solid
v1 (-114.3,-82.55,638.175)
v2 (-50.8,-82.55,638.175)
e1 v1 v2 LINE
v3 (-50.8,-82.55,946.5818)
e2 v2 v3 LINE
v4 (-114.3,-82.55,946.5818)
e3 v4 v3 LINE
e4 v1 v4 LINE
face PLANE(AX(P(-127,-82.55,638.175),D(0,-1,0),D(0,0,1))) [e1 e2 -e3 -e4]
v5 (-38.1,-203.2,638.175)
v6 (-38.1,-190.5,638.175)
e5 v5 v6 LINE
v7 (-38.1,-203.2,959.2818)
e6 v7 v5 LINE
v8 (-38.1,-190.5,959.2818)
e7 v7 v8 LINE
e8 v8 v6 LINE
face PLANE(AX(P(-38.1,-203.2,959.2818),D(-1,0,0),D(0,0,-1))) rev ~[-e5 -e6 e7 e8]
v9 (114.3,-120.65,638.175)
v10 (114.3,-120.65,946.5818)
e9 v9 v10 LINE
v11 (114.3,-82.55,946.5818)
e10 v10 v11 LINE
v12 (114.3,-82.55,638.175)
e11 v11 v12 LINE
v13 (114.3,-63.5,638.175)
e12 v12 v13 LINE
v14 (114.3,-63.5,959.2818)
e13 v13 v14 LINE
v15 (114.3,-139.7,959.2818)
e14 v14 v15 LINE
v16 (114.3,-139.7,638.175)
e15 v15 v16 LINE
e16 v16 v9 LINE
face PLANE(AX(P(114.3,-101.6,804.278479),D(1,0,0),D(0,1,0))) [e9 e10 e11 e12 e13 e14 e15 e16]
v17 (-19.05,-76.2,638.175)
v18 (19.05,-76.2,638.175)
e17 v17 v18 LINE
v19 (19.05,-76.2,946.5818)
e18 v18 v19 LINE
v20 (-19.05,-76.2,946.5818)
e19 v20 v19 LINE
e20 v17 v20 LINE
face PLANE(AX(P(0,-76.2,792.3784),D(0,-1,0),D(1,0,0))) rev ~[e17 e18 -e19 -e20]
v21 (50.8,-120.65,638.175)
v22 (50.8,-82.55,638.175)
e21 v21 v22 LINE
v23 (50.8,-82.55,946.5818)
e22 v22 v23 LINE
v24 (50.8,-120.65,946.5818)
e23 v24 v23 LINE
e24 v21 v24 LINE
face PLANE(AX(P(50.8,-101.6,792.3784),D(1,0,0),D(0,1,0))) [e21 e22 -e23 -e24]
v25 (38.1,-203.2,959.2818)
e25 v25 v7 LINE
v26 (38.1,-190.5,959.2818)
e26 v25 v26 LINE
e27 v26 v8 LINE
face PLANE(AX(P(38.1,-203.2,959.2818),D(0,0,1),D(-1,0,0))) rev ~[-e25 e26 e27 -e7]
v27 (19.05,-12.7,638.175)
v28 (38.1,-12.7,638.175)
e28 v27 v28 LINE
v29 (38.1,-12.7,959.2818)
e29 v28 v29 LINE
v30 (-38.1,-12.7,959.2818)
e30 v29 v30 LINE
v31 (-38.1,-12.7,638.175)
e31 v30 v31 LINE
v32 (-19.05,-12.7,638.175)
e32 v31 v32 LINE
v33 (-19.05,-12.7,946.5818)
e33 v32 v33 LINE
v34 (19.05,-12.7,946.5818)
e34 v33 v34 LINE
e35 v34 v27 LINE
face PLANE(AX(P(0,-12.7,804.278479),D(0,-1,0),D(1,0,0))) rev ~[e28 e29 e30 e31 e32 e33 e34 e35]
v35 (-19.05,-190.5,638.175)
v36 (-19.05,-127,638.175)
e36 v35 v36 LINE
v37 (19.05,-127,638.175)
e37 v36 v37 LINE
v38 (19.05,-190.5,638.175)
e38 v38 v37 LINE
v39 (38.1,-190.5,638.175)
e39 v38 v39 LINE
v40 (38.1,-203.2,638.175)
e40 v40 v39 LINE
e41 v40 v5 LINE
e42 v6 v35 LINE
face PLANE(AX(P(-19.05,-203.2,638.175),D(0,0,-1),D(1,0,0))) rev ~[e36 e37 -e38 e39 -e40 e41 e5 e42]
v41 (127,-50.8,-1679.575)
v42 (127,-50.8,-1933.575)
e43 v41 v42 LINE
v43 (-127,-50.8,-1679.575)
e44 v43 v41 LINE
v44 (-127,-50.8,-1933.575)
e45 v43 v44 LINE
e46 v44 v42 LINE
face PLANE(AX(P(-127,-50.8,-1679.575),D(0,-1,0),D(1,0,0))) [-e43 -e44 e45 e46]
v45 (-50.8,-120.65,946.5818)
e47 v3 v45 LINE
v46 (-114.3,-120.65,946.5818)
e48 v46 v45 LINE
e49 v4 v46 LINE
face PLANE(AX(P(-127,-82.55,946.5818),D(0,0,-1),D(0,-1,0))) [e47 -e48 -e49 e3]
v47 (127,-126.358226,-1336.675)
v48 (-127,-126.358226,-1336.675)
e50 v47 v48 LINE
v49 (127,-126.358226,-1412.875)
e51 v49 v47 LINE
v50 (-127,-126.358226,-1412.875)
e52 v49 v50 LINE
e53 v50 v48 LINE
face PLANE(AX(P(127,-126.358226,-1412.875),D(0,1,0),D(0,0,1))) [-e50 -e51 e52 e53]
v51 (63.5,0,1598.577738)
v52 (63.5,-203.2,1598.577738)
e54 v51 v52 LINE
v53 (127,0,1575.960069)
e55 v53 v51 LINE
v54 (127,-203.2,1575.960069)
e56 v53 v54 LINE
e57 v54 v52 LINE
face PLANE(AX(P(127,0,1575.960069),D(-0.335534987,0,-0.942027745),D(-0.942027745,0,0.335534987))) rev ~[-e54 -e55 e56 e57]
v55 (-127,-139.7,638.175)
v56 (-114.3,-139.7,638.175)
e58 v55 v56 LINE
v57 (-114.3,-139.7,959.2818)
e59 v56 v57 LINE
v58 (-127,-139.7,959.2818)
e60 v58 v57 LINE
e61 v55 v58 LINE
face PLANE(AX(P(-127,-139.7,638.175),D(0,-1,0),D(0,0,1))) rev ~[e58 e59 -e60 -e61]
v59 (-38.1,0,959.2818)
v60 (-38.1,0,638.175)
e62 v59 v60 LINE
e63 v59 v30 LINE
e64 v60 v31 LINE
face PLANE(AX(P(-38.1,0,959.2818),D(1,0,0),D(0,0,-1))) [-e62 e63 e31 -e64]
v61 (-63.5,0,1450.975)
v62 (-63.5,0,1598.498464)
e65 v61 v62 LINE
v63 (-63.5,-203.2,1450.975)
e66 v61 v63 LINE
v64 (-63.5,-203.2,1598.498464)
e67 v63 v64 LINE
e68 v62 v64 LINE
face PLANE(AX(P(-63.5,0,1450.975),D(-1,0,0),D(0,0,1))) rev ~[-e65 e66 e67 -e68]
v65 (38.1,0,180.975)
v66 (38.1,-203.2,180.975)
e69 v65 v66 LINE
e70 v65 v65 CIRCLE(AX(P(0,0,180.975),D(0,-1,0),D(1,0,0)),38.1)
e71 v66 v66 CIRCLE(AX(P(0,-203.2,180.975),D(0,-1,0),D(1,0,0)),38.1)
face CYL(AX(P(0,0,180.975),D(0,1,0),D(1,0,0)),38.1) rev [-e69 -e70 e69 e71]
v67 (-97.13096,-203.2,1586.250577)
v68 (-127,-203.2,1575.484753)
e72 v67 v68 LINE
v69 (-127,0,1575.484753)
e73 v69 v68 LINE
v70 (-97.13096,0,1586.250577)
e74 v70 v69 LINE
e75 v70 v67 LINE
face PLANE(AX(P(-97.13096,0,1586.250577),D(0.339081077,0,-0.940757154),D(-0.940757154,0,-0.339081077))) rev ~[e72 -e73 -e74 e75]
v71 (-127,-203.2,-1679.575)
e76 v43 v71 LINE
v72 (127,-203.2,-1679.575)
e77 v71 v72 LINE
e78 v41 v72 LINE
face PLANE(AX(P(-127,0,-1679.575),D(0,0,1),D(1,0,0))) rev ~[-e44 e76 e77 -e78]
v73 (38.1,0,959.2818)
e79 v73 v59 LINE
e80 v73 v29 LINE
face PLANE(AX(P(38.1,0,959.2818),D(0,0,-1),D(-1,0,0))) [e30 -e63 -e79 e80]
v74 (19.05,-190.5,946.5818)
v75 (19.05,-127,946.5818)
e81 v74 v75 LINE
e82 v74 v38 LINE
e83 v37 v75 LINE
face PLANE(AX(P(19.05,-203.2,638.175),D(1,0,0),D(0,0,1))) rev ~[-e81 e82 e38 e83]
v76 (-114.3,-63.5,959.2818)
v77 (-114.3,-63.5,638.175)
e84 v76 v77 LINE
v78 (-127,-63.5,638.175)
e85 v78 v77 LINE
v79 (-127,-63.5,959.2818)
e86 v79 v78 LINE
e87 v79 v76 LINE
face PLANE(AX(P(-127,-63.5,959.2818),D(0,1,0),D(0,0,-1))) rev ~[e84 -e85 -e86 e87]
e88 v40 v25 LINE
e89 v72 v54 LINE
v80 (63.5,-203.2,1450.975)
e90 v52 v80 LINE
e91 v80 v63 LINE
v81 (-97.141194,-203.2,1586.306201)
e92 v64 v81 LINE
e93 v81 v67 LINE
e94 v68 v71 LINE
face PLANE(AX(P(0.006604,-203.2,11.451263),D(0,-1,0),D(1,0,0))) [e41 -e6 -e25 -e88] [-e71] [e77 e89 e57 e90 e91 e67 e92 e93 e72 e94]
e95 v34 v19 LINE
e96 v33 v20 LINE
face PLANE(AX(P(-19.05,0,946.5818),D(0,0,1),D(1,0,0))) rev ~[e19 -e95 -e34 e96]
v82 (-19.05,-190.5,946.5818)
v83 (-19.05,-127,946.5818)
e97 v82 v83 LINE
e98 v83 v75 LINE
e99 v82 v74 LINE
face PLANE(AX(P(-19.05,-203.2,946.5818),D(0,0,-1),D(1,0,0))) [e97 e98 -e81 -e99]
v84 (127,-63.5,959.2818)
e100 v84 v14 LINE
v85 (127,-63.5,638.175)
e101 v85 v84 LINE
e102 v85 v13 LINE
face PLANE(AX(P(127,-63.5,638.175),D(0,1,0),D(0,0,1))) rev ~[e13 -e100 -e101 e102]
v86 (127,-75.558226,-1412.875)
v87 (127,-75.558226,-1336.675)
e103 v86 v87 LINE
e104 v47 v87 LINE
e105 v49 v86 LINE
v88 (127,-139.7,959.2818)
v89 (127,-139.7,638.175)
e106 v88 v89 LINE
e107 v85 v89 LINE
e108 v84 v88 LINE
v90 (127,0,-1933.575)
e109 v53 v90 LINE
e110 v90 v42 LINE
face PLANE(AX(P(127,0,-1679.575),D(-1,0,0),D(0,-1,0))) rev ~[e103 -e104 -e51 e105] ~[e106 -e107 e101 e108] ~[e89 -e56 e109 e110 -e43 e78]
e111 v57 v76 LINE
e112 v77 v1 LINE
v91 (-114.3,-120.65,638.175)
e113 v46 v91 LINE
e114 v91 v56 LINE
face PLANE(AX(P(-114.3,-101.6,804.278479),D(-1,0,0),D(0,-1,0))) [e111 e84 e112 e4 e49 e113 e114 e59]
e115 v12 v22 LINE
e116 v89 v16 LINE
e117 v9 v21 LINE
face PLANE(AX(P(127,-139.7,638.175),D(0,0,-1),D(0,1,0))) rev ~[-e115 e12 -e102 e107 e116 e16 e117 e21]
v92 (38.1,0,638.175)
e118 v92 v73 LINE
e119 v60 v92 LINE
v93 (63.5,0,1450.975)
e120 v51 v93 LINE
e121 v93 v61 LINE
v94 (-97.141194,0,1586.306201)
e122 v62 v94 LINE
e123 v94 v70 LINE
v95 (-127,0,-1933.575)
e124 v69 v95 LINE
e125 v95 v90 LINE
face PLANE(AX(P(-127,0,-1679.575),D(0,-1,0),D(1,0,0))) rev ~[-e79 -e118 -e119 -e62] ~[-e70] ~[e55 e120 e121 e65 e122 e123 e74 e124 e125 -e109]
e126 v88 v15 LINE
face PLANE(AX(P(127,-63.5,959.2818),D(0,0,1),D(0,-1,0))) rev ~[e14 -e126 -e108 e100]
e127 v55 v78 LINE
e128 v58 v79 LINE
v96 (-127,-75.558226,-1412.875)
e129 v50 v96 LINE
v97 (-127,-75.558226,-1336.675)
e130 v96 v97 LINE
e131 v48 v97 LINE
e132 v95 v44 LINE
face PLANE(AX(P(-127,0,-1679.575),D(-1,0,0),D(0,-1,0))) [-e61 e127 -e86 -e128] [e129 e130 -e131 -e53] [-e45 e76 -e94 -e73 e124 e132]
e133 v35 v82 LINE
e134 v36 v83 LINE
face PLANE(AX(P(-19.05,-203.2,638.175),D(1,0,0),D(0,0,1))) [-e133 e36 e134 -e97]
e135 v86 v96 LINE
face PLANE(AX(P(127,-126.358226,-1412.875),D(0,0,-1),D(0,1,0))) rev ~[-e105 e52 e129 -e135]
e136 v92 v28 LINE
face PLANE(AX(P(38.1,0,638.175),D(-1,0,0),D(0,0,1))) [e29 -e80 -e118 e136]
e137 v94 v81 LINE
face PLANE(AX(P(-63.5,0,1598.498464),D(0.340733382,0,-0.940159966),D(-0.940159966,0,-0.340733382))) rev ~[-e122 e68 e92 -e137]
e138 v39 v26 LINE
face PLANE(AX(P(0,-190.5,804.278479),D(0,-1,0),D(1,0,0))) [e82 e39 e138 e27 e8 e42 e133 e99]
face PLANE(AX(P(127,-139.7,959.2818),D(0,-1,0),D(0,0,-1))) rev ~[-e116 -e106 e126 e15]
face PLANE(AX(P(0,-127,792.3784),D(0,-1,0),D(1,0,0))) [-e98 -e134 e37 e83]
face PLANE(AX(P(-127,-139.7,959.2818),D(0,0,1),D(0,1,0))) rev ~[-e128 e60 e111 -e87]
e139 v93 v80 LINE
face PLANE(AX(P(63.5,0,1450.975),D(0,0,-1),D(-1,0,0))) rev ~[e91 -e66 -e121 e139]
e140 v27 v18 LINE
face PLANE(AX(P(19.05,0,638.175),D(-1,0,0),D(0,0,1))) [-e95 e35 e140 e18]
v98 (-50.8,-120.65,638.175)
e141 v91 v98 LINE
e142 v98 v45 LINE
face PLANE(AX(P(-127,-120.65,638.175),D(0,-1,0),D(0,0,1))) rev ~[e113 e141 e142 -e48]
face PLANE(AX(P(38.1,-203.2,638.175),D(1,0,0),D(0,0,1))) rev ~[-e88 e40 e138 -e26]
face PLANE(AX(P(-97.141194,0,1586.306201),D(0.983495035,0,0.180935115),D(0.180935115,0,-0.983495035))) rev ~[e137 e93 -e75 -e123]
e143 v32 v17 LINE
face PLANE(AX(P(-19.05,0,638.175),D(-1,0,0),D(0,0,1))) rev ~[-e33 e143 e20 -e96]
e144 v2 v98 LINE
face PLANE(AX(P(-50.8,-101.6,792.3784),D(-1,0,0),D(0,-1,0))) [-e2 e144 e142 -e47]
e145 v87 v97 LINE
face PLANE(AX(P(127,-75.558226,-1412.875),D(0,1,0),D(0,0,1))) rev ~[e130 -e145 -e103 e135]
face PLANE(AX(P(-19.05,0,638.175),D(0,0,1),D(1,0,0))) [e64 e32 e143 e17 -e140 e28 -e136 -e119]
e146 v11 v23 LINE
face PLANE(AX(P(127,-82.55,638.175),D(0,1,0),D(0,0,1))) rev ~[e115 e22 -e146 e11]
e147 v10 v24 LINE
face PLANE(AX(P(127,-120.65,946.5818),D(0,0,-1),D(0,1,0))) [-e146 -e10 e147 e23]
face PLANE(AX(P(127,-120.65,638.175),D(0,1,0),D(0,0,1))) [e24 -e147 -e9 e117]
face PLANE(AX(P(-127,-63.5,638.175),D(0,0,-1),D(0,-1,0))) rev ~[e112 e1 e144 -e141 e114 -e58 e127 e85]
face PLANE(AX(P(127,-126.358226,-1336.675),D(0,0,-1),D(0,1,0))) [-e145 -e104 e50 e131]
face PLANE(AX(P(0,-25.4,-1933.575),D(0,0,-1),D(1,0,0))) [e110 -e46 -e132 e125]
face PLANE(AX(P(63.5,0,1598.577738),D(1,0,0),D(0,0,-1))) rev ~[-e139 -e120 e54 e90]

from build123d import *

# Parameters (mm, degrees)
F0_R      = 38.1
F0_W      = 38.1
F0_H      = 308.4068
F1_DEPTH  = 203.2
F2_DEPTH  = 76.2
F3_W      = 38.1
F3_H      = 308.4068
F4_DEPTH  = 76.2
F5_DEPTH  = 12.7
F6_DEPTH  = 12.7
F7_W      = 38.1
F7_H      = 308.4068
F8_DEPTH  = 76.2
F9_DEPTH  = 12.7
F10_W     = 38.1
F10_H     = 308.4068
F11_DEPTH = 76.2
F12_DEPTH = 12.7
F7_W_2    = 50.8
F7_H_2    = 76.2
F13_DEPTH = 254
F14_W     = 254
F14_H     = 50.8
F15_DEPTH = 254


# Not quite as in the source:
# - a feature names something its author has since deleted; it is built from what else it names


with BuildPart() as f1:
    # F0 (on Front) → F1 (new body)
    with BuildSketch(Plane.XZ):
        Polygon((-97.1309603494, 1586.2505768385), (-127, 1575.484752655), (-127, -1679.575), (127, -1679.575), (127, 1575.9600688261), (63.5, 1598.5777378082), (63.5, 1450.975), (-63.5, 1450.975), (-63.5, 1598.4984636307), (-97.1411935326, 1586.3062005624), align=None)
        with Locations((0, 180.975)):
            Circle(F0_R, mode=Mode.SUBTRACT)
        Polygon((19.05, 638.175), (-19.05, 638.175), (-38.1, 638.175), (-38.1, 959.2818), (38.1, 959.2818), (38.1, 638.175), align=None, mode=Mode.SUBTRACT)
        with Locations((0, 792.3784)):
            Rectangle(F0_W, F0_H)
        Polygon((-19.05, 638.175), (-19.05, 946.5818), (19.05, 946.5818), (19.05, 638.175), (38.1, 638.175), (38.1, 959.2818), (-38.1, 959.2818), (-38.1, 638.175), align=None)
    extrude(amount=F1_DEPTH)

    # F0 (on Front) → F2 (cut)
    with BuildSketch(Plane.XZ):
        with Locations((0, 792.3784)):
            Rectangle(F0_W, F0_H)
    extrude(amount=F2_DEPTH, mode=Mode.SUBTRACT)

    # F3 (on face) → F4 (cut)
    with BuildSketch(Plane.XZ.offset(203.2)):
        with Locations((0, 792.3784)):
            Rectangle(F3_W, F3_H)
    extrude(amount=-F4_DEPTH, mode=Mode.SUBTRACT)

    # F3 (on face) → F5 (cut)
    with BuildSketch(Plane.XZ.offset(203.2)):
        Polygon((-38.1, 638.175), (-19.05, 638.175), (-19.05, 946.5818), (19.05, 946.5818), (19.05, 638.175), (38.1, 638.175), (38.1, 959.2818), (-38.1, 959.2818), align=None)
    extrude(amount=-F5_DEPTH, mode=Mode.SUBTRACT)

    # F0 (on Front) → F6 (cut)
    with BuildSketch(Plane.XZ):
        Polygon((-19.05, 638.175), (-19.05, 946.5818), (19.05, 946.5818), (19.05, 638.175), (38.1, 638.175), (38.1, 959.2818), (-38.1, 959.2818), (-38.1, 638.175), align=None)
    extrude(amount=F6_DEPTH, mode=Mode.SUBTRACT)

    # F7 (on face) → F8 (cut)
    with BuildSketch(Plane.YZ.offset(127)):
        with Locations((-101.6, 792.3784)):
            Rectangle(F7_W, F7_H)
    extrude(amount=-F8_DEPTH, mode=Mode.SUBTRACT)

    # F7 (on face) → F9 (cut)
    with BuildSketch(Plane.YZ.offset(127)):
        Polygon((-139.7, 638.175), (-120.65, 638.175), (-120.65, 946.5818), (-82.55, 946.5818), (-82.55, 638.175), (-63.5, 638.175), (-63.5, 959.2818), (-139.7, 959.2818), align=None)
    extrude(amount=-F9_DEPTH, mode=Mode.SUBTRACT)

    # F10 (on face) → F11 (cut)
    with BuildSketch(Plane(origin=(-127, 0, 0), x_dir=(0, -1, 0), z_dir=(-1, 0, 0))):
        with Locations((101.6, 792.3784)):
            Rectangle(F10_W, F10_H)
    extrude(amount=-F11_DEPTH, mode=Mode.SUBTRACT)

    # F10 (on face) → F12 (cut)
    with BuildSketch(Plane(origin=(-127, 0, 0), x_dir=(0, -1, 0), z_dir=(-1, 0, 0))):
        Polygon((63.5, 638.175), (82.55, 638.175), (82.55, 946.5818), (120.65, 946.5818), (120.65, 638.175), (139.7, 638.175), (139.7, 959.2818), (63.5, 959.2818), align=None)
    extrude(amount=-F12_DEPTH, mode=Mode.SUBTRACT)

    # F7 (on face) → F13 (cut)
    with BuildSketch(Plane.YZ.offset(127)):
        with Locations((-100.9582259417, -1374.775)):
            Rectangle(F7_W_2, F7_H_2)
    extrude(amount=-F13_DEPTH, mode=Mode.SUBTRACT)

    # F14 (on face) → F15 (join)
    with BuildSketch(Plane(origin=(0, 0, -1679.575), x_dir=(1, 0, 0), z_dir=(0, 0, -1))):
        with Locations((0, 25.4)):
            Rectangle(F14_W, F14_H)
    extrude(amount=F15_DEPTH)


solid = f1.part
